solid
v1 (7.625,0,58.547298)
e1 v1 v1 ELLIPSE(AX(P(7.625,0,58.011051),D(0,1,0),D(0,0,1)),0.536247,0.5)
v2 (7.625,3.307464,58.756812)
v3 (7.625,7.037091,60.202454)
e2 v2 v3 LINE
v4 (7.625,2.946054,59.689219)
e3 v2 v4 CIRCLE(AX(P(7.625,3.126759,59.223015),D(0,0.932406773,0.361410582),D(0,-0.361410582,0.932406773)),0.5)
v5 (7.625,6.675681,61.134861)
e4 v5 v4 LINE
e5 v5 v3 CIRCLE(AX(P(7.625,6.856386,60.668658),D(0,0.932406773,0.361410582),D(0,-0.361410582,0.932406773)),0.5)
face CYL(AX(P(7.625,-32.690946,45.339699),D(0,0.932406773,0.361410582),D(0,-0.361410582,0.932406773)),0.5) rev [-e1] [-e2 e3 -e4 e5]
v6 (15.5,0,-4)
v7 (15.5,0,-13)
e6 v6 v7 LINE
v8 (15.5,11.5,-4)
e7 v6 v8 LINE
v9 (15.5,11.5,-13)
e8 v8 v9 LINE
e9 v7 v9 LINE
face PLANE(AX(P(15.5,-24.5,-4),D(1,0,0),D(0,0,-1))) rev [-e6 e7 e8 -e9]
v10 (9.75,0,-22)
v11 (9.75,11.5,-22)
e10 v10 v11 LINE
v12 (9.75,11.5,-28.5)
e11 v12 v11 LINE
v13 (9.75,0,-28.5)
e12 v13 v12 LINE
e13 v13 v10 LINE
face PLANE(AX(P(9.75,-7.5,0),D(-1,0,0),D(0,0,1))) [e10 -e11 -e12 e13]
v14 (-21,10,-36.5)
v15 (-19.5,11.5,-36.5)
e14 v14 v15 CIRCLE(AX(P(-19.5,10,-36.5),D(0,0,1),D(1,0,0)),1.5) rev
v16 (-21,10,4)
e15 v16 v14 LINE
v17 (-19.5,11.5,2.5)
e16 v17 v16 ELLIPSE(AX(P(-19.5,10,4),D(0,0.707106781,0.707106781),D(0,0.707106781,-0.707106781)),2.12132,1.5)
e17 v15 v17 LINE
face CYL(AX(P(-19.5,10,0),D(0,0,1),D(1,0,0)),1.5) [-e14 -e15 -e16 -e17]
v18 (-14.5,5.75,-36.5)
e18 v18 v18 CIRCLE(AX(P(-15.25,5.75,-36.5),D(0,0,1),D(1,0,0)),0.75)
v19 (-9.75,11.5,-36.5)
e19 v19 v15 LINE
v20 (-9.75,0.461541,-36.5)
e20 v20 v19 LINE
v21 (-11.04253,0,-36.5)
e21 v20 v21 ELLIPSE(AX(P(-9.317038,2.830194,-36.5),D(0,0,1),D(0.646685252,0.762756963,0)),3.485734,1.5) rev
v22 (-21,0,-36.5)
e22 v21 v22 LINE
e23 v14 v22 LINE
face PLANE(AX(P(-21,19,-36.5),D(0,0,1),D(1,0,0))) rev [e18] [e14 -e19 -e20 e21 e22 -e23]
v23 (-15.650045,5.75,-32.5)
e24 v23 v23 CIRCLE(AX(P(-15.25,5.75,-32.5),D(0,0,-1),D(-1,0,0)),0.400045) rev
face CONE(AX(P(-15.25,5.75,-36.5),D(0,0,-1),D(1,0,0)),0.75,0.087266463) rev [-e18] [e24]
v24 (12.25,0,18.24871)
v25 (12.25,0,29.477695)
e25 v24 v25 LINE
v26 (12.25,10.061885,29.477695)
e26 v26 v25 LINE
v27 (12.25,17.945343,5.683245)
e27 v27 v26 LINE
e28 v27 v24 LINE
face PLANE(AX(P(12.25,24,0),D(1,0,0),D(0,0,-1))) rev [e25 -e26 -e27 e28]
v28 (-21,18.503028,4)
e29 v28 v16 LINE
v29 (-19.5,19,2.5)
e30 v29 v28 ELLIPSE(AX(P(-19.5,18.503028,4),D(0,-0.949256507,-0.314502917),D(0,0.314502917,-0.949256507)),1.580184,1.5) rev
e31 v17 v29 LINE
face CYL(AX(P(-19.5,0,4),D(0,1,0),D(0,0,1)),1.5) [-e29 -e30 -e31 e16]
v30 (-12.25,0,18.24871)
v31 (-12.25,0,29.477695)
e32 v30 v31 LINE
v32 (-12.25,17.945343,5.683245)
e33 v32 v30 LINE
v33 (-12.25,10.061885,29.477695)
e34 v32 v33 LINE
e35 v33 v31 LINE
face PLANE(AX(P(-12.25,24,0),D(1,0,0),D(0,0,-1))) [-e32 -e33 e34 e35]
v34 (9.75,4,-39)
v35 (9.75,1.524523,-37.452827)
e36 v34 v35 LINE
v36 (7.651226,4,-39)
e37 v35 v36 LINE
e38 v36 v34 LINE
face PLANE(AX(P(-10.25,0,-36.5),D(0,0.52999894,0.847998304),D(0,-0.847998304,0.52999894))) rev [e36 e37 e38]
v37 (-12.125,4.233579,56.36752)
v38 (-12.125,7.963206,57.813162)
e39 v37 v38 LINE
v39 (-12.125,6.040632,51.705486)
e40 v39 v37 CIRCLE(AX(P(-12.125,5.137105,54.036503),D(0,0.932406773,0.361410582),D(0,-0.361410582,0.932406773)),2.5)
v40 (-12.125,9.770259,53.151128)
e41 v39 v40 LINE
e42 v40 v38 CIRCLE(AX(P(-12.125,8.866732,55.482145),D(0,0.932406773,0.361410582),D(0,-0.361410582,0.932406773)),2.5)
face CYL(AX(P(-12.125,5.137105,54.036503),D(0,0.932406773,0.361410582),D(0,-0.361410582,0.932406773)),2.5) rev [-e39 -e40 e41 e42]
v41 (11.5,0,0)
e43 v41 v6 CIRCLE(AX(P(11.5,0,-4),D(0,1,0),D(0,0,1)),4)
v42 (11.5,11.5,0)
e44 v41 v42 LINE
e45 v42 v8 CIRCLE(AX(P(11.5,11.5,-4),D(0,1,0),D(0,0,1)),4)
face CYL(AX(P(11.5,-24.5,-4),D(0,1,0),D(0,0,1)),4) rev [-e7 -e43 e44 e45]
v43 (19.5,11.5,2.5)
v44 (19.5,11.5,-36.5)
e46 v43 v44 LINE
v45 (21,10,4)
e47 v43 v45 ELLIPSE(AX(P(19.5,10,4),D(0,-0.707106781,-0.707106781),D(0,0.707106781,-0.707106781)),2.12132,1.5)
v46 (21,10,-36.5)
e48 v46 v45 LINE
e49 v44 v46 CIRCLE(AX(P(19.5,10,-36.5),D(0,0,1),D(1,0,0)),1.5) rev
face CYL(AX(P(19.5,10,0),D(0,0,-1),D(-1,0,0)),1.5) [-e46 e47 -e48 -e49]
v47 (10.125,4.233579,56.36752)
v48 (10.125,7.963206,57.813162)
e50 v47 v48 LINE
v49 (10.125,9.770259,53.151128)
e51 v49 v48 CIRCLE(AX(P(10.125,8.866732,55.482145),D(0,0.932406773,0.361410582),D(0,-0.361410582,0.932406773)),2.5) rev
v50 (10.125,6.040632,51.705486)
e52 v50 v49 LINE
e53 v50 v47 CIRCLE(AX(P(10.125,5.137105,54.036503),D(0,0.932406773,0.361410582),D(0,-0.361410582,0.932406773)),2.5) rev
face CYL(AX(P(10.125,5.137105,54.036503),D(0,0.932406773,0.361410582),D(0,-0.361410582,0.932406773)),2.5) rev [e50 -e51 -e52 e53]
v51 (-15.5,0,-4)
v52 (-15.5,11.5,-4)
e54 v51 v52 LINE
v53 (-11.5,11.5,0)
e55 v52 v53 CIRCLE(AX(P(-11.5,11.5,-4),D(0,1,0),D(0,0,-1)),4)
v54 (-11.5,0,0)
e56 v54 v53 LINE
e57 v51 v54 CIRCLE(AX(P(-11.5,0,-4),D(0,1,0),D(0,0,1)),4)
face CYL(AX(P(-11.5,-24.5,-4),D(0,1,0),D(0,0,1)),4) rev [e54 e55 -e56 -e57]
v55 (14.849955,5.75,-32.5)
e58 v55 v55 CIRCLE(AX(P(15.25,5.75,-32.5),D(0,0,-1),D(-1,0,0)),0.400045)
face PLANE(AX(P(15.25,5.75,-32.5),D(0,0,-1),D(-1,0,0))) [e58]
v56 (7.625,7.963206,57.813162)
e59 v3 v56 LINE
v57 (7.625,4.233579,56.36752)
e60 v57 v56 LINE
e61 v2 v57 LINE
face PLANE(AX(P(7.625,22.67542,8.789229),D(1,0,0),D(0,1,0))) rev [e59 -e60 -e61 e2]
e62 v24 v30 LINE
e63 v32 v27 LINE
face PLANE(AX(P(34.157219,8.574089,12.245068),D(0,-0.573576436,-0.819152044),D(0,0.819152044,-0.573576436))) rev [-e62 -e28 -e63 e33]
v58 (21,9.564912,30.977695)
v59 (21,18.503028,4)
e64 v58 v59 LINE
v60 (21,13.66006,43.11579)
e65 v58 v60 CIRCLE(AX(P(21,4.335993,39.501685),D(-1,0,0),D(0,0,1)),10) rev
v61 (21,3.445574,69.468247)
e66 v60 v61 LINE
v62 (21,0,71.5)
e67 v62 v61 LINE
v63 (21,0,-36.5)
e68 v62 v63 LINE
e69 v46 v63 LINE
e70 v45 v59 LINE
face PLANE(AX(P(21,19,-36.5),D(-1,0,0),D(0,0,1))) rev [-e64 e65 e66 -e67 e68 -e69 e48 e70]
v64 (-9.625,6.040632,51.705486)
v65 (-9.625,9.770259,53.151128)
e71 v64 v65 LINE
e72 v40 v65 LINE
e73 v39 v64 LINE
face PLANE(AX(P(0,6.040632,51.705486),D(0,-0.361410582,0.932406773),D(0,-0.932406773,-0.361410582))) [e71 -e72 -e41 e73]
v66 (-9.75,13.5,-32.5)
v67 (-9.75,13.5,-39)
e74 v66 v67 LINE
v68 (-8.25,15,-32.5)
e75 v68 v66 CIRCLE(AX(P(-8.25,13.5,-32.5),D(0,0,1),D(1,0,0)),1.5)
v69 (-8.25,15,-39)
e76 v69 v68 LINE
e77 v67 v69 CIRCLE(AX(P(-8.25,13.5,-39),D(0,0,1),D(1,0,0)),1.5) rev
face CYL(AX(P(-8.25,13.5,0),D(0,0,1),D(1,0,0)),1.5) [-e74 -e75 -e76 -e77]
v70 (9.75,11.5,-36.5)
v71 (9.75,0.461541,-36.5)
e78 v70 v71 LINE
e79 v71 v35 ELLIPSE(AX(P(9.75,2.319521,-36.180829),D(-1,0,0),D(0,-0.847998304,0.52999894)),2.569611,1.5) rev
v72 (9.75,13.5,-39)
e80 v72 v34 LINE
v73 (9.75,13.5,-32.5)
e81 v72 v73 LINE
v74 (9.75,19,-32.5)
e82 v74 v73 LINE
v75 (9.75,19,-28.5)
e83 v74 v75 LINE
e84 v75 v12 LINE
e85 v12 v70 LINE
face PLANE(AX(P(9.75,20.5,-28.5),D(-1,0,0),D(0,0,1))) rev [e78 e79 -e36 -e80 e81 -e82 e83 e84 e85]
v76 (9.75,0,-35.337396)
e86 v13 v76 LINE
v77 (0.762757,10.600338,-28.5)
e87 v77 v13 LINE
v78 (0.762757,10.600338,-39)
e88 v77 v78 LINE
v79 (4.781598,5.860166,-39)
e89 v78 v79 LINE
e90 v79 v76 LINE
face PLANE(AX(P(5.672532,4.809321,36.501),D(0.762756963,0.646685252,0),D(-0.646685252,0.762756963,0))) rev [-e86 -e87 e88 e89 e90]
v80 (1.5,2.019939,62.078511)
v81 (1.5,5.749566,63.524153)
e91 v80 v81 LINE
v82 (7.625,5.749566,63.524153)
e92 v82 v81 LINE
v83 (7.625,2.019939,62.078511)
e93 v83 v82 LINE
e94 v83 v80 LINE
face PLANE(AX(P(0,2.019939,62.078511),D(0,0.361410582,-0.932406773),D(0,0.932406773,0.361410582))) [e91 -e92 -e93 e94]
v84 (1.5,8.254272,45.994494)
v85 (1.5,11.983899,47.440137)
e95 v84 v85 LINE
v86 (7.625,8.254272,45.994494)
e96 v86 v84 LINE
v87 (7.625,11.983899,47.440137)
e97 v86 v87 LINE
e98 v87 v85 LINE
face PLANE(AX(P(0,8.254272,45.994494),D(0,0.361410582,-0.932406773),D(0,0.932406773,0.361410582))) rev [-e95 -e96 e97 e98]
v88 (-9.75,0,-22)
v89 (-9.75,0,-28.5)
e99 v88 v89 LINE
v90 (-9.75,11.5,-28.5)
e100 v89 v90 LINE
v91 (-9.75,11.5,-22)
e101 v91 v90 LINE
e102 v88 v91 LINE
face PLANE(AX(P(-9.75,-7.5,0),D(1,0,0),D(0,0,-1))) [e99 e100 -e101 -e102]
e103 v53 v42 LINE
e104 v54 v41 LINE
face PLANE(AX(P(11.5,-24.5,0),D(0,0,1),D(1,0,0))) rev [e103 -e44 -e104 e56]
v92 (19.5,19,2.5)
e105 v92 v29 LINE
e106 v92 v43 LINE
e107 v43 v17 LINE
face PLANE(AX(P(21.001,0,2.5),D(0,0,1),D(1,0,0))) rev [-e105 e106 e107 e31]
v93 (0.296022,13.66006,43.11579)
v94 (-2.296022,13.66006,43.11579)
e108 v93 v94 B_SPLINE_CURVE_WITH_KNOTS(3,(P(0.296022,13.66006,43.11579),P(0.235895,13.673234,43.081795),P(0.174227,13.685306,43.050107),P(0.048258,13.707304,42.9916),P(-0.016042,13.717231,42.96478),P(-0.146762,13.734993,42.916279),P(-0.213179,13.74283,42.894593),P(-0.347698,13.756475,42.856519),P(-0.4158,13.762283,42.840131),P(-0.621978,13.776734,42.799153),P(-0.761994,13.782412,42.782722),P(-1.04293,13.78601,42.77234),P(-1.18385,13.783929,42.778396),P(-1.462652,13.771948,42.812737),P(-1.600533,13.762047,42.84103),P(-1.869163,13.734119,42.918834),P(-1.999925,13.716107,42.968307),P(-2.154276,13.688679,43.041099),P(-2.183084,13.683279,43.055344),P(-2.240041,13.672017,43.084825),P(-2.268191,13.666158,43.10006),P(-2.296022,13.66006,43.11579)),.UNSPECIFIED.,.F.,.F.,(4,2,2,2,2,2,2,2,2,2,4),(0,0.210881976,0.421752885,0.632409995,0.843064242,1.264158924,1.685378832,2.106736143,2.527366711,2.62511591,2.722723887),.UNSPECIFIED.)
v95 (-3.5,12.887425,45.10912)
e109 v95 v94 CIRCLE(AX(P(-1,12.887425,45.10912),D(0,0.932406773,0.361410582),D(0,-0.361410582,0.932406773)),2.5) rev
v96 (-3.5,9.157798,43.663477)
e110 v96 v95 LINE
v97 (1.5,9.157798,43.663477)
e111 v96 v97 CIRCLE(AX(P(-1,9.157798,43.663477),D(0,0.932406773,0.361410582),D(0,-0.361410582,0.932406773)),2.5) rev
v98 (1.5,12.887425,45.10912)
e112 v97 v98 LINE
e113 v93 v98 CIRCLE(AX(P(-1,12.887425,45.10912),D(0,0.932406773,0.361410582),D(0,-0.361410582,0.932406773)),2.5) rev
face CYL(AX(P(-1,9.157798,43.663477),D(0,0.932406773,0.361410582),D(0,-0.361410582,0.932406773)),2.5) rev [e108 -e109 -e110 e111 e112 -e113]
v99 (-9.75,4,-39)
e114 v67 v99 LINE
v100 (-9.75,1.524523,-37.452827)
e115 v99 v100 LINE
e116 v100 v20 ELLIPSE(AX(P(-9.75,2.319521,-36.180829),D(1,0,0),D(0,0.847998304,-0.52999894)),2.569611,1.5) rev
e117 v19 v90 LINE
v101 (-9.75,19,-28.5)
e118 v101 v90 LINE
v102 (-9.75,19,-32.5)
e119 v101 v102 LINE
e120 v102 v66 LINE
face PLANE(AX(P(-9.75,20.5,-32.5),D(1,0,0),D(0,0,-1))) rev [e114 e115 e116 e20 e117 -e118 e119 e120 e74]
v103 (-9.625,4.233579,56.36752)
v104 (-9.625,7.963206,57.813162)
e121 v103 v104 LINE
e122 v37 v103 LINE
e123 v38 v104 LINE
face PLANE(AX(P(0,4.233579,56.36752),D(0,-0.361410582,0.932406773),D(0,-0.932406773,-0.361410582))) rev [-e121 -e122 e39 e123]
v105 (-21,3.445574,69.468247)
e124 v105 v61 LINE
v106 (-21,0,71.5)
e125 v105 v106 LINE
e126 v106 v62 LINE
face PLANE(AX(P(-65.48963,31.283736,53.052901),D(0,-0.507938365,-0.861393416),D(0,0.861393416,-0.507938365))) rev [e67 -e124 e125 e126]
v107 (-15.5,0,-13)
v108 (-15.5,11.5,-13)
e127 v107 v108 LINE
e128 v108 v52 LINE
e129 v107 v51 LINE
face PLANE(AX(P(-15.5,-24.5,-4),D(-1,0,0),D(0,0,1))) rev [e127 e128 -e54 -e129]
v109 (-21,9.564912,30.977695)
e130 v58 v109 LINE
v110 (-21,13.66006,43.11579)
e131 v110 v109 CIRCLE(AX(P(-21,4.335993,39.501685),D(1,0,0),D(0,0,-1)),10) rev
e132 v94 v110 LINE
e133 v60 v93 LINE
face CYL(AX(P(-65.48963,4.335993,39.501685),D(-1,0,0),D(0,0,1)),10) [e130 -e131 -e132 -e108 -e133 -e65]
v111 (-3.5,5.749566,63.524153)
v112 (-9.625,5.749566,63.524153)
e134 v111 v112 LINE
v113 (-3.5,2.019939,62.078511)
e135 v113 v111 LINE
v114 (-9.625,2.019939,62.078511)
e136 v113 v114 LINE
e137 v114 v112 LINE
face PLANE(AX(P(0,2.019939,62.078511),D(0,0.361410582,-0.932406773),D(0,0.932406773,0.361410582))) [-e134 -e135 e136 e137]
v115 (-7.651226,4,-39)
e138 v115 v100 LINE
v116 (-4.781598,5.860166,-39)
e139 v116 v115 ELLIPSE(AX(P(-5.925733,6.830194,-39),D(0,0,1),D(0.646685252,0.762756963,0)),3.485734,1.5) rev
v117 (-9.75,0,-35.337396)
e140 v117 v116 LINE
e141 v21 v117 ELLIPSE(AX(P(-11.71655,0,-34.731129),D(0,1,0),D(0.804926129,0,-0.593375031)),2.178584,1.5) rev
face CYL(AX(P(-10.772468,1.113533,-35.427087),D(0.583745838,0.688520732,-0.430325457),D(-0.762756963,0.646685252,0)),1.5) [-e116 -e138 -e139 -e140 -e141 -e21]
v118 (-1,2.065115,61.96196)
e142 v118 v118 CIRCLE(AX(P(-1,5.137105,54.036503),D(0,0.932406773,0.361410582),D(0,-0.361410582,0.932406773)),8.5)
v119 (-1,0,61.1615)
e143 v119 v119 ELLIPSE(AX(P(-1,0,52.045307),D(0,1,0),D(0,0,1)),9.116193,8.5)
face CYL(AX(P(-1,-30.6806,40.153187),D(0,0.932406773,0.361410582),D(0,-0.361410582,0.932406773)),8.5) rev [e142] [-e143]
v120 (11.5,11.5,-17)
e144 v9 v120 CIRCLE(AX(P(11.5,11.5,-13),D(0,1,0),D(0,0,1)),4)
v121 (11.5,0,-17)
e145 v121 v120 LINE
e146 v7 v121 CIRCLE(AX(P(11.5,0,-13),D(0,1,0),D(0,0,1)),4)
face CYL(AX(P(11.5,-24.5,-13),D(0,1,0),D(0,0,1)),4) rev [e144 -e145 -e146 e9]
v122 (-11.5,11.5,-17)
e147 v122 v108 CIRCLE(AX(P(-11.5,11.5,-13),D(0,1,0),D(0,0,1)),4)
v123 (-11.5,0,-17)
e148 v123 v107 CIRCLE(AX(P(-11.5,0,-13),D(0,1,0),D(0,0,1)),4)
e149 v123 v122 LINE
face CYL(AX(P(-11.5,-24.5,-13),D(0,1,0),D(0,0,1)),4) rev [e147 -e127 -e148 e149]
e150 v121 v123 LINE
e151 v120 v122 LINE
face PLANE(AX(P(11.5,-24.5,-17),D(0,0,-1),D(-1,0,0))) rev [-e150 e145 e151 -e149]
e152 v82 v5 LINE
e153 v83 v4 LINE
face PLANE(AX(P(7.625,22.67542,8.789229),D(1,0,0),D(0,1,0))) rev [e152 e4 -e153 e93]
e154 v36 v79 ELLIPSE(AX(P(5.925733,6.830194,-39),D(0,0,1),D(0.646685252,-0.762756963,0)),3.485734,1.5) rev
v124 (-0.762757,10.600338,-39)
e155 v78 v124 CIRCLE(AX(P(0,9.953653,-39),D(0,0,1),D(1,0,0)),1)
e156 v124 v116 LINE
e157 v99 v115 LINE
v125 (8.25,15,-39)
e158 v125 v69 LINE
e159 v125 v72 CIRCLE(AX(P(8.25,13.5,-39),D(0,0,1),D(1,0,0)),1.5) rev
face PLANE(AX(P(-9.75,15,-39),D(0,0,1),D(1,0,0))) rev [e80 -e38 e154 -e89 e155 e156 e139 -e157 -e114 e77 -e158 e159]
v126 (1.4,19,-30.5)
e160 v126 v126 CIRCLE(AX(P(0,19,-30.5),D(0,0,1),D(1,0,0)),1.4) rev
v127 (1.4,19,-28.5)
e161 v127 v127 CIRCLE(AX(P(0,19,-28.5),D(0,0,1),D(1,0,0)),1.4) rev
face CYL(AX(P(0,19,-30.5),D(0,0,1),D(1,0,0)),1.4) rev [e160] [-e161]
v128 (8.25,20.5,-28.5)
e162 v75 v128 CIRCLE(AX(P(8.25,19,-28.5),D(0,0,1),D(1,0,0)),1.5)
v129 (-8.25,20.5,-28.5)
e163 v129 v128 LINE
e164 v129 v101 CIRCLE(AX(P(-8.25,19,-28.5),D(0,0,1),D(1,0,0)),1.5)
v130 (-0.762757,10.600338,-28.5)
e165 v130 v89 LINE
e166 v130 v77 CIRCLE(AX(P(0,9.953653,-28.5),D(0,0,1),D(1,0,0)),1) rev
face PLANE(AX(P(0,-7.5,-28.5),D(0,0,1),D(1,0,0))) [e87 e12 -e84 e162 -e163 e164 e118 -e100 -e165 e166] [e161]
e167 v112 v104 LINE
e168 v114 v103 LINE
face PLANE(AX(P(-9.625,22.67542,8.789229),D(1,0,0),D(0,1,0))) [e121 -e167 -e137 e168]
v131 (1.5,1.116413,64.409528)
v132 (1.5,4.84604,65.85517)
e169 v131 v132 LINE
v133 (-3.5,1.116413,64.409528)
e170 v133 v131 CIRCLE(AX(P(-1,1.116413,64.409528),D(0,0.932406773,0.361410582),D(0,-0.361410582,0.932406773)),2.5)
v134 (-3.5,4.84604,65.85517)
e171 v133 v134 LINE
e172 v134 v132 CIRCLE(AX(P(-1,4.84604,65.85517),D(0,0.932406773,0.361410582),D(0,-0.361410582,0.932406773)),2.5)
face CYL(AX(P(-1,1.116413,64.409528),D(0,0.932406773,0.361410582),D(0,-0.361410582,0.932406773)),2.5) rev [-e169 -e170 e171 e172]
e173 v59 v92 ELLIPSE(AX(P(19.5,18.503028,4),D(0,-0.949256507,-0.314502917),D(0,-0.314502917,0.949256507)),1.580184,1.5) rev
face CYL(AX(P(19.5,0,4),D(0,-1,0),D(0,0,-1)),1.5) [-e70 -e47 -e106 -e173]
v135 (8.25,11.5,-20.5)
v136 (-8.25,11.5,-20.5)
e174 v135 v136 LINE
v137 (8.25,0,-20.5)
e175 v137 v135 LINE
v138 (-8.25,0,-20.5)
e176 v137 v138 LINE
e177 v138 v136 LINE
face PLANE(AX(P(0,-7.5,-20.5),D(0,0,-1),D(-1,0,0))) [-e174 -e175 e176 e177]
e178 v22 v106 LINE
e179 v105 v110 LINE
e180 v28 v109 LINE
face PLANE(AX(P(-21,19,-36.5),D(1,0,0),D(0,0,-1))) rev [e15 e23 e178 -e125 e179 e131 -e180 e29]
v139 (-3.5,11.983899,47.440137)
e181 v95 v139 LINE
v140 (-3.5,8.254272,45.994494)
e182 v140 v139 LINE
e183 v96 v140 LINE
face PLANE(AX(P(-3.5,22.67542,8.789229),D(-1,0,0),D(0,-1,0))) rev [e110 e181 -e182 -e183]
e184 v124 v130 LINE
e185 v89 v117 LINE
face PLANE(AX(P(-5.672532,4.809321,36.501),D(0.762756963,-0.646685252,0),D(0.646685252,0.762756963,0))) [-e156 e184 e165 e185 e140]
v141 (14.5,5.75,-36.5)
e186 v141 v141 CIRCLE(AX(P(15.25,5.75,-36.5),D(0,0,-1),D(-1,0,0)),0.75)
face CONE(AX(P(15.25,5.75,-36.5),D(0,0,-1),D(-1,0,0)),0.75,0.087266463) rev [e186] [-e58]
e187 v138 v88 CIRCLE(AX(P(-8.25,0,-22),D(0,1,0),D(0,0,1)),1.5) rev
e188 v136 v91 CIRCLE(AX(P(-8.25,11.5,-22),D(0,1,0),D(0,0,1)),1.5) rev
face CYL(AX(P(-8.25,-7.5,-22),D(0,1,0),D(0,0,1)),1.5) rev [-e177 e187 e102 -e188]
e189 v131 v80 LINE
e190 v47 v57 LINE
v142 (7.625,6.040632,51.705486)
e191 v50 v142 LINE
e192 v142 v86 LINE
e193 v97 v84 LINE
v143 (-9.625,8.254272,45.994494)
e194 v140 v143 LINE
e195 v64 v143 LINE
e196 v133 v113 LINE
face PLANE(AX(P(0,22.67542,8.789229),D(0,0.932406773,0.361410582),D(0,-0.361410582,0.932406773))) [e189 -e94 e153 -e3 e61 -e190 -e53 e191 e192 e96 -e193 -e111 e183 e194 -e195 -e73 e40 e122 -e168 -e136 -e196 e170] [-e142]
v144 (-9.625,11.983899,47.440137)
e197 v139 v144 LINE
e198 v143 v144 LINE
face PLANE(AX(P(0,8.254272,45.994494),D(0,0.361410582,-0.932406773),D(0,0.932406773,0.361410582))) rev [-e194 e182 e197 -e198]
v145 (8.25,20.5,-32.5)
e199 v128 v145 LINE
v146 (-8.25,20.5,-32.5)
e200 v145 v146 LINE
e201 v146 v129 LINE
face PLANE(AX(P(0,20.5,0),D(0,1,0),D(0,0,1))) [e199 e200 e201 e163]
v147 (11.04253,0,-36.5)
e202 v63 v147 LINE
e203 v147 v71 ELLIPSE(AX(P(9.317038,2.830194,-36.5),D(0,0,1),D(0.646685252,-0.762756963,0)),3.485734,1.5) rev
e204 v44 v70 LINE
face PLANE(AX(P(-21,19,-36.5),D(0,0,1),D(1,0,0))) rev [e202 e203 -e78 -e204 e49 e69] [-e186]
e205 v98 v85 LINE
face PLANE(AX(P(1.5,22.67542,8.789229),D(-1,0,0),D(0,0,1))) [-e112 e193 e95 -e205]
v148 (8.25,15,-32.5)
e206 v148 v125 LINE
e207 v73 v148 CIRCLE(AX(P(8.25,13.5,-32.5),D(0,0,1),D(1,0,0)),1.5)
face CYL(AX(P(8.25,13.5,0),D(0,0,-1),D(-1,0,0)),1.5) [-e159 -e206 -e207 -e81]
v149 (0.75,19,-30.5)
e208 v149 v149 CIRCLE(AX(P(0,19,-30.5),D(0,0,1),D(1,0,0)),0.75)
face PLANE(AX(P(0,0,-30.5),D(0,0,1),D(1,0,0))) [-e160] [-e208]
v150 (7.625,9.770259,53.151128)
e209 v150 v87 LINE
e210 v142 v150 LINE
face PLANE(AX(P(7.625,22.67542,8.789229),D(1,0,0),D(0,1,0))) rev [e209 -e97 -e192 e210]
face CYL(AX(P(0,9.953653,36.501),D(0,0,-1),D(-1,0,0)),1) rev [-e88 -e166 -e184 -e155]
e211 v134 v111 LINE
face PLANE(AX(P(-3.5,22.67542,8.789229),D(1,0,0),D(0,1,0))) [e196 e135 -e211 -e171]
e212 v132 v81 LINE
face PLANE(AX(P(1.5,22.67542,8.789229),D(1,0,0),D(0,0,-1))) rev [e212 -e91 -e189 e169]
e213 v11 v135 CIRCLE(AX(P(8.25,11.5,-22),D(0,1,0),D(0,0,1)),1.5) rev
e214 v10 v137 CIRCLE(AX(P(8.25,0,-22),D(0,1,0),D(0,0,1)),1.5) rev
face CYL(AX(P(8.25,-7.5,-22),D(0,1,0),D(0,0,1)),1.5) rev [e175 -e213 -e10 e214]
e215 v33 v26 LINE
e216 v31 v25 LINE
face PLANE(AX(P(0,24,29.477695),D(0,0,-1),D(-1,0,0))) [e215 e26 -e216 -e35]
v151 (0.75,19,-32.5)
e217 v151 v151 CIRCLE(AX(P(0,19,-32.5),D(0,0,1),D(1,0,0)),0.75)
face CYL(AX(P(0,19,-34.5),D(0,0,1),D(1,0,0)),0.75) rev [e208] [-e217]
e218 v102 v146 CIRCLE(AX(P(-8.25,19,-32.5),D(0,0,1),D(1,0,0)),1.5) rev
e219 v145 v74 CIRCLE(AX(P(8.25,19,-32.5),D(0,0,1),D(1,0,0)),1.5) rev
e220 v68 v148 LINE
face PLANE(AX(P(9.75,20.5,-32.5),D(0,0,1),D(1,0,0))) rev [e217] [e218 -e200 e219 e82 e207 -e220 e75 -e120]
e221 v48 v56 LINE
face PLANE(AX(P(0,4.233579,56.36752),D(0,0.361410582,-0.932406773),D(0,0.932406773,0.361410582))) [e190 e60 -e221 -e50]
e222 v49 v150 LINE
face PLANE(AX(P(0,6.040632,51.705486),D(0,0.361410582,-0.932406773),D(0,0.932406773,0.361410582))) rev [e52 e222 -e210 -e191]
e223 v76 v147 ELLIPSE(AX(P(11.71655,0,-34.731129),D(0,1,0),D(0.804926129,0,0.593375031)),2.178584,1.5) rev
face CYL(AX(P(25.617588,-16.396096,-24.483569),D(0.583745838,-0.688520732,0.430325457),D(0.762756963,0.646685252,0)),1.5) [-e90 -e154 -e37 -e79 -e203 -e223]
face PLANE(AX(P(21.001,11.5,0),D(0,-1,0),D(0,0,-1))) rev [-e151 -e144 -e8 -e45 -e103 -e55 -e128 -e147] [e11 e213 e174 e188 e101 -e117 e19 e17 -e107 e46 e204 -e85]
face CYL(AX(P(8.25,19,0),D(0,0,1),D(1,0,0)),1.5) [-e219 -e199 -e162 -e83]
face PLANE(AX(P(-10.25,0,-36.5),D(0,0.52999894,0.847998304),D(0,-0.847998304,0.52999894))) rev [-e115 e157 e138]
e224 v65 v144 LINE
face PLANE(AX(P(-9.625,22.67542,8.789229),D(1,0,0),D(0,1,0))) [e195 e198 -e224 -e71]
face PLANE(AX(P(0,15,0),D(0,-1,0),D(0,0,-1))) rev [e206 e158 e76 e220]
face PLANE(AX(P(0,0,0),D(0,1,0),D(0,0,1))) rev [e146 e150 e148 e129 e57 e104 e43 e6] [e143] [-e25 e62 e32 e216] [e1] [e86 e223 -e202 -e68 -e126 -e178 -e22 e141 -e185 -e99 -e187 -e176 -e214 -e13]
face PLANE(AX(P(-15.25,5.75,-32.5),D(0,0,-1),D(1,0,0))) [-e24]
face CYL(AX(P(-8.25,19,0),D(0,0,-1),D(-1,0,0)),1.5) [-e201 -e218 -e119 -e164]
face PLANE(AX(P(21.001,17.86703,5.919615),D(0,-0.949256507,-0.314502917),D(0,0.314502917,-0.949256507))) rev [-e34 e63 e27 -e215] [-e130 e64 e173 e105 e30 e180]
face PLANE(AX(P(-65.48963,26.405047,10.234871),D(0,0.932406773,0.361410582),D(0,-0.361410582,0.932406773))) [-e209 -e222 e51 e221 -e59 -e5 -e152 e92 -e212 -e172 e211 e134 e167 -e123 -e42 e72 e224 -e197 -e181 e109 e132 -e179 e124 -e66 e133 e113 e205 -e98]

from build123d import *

# Parameters (mm, degrees)
EXTRUDE_1_DEPTH          = 19
CUT_EXTRUDE_1_REACH      = 60.798
CUT_EXTRUDE_2_DEPTH      = 19
SKETCH_5_W               = 19.5
SKETCH_5_H               = 3.999999999999993
EXTRUDE_2_DEPTH          = 9
EXTRUDE_3_DEPTH          = 3.5
EXTRUDE_3_DEPTH_BACK     = 11.5
CUT_EXTRUDE_3_REACH      = 83.003
FILLET_1_R               = 1.5
FILLET_2_R               = 1
CUT_EXTRUDE_4_DEPTH      = 19.999999999999996
FILLET_3_R               = 1.5
CUT_EXTRUDE_15_DEPTH     = 2
SKETCH_18_R              = 0.7500000000000009
CUT_EXTRUDE_16_DEPTH     = 4
SKETCH_20_R              = 0.7500000000000004
CUT_EXTRUDE_18_DEPTH     = 4
CUT_EXTRUDE_18_DRAFT     = -5.000000000000011
MIRROR_1_COPY_1_SKETCH_R = 0.7500000000000004
MIRROR_1_COPY_1_DEPTH    = 4
MIRROR_1_COPY_1_DRAFT    = -5.000000000000011
FILLET_7_R               = 1.5
CUT_EXTRUDE_22_DEPTH     = 24.000000000000007
EXTRUDE_4_DEPTH          = 42
SKETCH_24_R              = 2.499999999999999
SKETCH_24_R_2            = 2.500000000000004
CUT_EXTRUDE_23_DEPTH     = 4
SKETCH_25_R              = 8.5
CUT_EXTRUDE_24_DEPTH     = 70.91291338858937
CUT_EXTRUDE_25_DEPTH     = 70.94027802815528
EXTRUDE_5_DEPTH          = 24.5
FILLET_8_R               = 10
CUT_EXTRUDE_26_DEPTH     = 36.000000000000014


with BuildPart() as part:
    # 草图1 → 凸台-拉伸1 (new body)
    with BuildSketch(Plane(origin=(0, 0, 0), x_dir=(1, 0, 0), z_dir=(0, 1, 0))):
        Polygon((-20.999999999999996, 36.499999999999986), (21.000000000000004, 36.499999999999986), (21.00000000000001, -36.500000000000014), (-20.999999999999986, -36.500000000000014), align=None)
    extrude(amount=EXTRUDE_1_DEPTH)

    # 草图3 → 切除-拉伸1 (cut, up to next)
    with BuildSketch(Plane.ZY.offset(20.999999999999993), mode=Mode.PRIVATE) as cut_extrude_1_sk1:
        Polygon((-36.499999999999986, 19), (-36.499999999999986, 11.5), (2.500000000000014, 11.5), (2.500000000000016, 19), align=None)
    cut_extrude_1_tool1 = extrude(cut_extrude_1_sk1.sketch, amount=-CUT_EXTRUDE_1_REACH, mode=Mode.PRIVATE) & part.part
    # 草图3 → 切除-拉伸1 (cut, up to next)
    with BuildSketch(Plane.ZY.offset(20.999999999999993), mode=Mode.PRIVATE) as cut_extrude_1_sk2:
        Polygon((36.500000000000014, 19), (2.500000000000014, 19), (30.977695197165154, 9.564912493391638), (36.500000000000014, 0), align=None)
    cut_extrude_1_tool2 = extrude(cut_extrude_1_sk2.sketch, amount=-CUT_EXTRUDE_1_REACH, mode=Mode.PRIVATE) & part.part
    add(cut_extrude_1_tool1.solids().sort_by_distance((-21, 15.25, -17))[0], mode=Mode.SUBTRACT)
    add(cut_extrude_1_tool2.solids().sort_by_distance((-21, 14.294033, 26.119155))[0], mode=Mode.SUBTRACT)

    # 草图4 → 切除-拉伸2 (cut)
    with BuildSketch(Plane(origin=(0, 11.5, 0), x_dir=(1, 0, 0), z_dir=(0, 1, 0))):
        with BuildLine():
            ThreePointArc((-8.249999999999991, 20.499999999999986), (-9.310660171779816, 20.939339828220167), (-9.749999999999991, 21.99999999999999))
            Line((-9.749999999999991, 21.99999999999999), (-9.749999999999991, 28.49999999999999))
            Line((-9.749999999999991, 28.49999999999999), (9.750000000000009, 28.49999999999999))
            Line((9.750000000000009, 28.49999999999999), (9.750000000000009, 21.999999999999993))
            ThreePointArc((9.750000000000009, 21.999999999999993), (9.31066017177983, 20.93933982822017), (8.250000000000009, 20.49999999999999))
            Line((8.250000000000009, 20.49999999999999), (-8.249999999999991, 20.499999999999986))
        make_face()
    extrude(amount=-CUT_EXTRUDE_2_DEPTH, mode=Mode.SUBTRACT)

    # 草图5 → 凸台-拉伸2 (add)
    with BuildSketch(Plane(origin=(0, 11.5, 0), x_dir=(1, 0, 0), z_dir=(0, 1, 0))):
        with Locations((8.88e-15, 30.49999999999999)):
            Rectangle(SKETCH_5_W, SKETCH_5_H)
    extrude(amount=EXTRUDE_2_DEPTH)

    # 草图6 → 凸台-拉伸3 (add, two sides: drawn at the far end of the back side and taken through both)
    with BuildSketch(Plane(origin=(0, 11.5, 0), x_dir=(1, 0, 0), z_dir=(0, 1, 0)).offset(-EXTRUDE_3_DEPTH_BACK)):
        Polygon((-9.749999999999991, 32.499999999999986), (-9.749999999999991, 38.999999999999986), (9.750000000000007, 38.999999999999986), (9.750000000000009, 32.499999999999986), align=None)
    extrude(amount=EXTRUDE_3_DEPTH + EXTRUDE_3_DEPTH_BACK)

    # 草图7 → 切除-拉伸3 (cut, up to next)
    with BuildSketch(Plane(origin=(0, 0, -38.999999999999986), x_dir=(-1, 0, 0), z_dir=(0, 0, -1)), mode=Mode.PRIVATE) as cut_extrude_3_sk1:
        Polygon((0, 11.500000000000002), (9.749999999999991, 0), (-9.750000000000007, -6.94e-15), align=None)
    cut_extrude_3_tool1 = extrude(cut_extrude_3_sk1.sketch, amount=-CUT_EXTRUDE_3_REACH, mode=Mode.PRIVATE) & part.part
    add(cut_extrude_3_tool1.solids().sort_by_distance((0, 3.833333, -39))[0], mode=Mode.SUBTRACT)

    # 圆角1
    fillet_1_edges = [part.edges().sort_by_distance(p)[0] for p in [
        (9.750000000000009, 20.5, -30.499999999999986),
        (-9.749999999999991, 20.5, -30.499999999999986),
        (9.750000000000007, 15, -35.749999999999986),
        (-9.749999999999991, 15, -35.749999999999986),
    ]]
    fillet(fillet_1_edges, radius=FILLET_1_R)

    # 圆角2
    fillet_2_edges = [part.edges().sort_by_distance(p)[0] for p in [
        (0, 11.500000000000002, -33.749999999999986),
    ]]
    fillet(fillet_2_edges, radius=FILLET_2_R)

    # 草图8 → 切除-拉伸4 (cut)
    with BuildSketch(Plane(origin=(9.750000000000009, 0, 0), x_dir=(0, 0, -1), z_dir=(1, 0, 0))):
        Polygon((36.499999999999986, 0), (38.999999999999986, 4), (38.999999999999986, 0), align=None)
    extrude(amount=-CUT_EXTRUDE_4_DEPTH, mode=Mode.SUBTRACT)

    # 圆角3
    fillet_3_edges = [part.edges().sort_by_distance(p)[0] for p in [
        (8.054347826086955, 2.0000000000000036, -37.74999999999998),
        (-8.054347826086952, 1.9999999999999991, -37.749999999999986),
    ]]
    fillet(fillet_3_edges, radius=FILLET_3_R)

    # 草图17 → 切除-拉伸15 (cut)
    with BuildSketch(Plane(origin=(0, 0, -28.49999999999999), x_dir=(-1, 0, 0), z_dir=(0, 0, -1))):
        with BuildLine():
            ThreePointArc((1.39999999999999, 18.999999999999996), (-8.59e-15, 20.399999999999995), (-1.4000000000000072, 18.999999999999996))
            Line((-1.4000000000000075, 18.999999999999996), (1.3999999999999897, 18.999999999999996))
        make_face()
        with BuildLine():
            Line((1.3999999999999897, 18.999999999999996), (-1.4000000000000075, 18.999999999999996))
            ThreePointArc((-1.4000000000000072, 18.999999999999996), (-8.93e-15, 17.599999999999998), (1.39999999999999, 18.999999999999996))
        make_face()
    extrude(amount=CUT_EXTRUDE_15_DEPTH, mode=Mode.SUBTRACT)

    # 草图18 → 切除-拉伸16 (cut)
    with BuildSketch(Plane.XY.offset(-30.499999999999993)):
        with Locations((8.67e-15, 18.999999999999996)):
            Circle(SKETCH_18_R)
    extrude(amount=-CUT_EXTRUDE_16_DEPTH, mode=Mode.SUBTRACT)


with BuildPart() as cut_extrude_18_tool:
    # 草图20 → 切除-拉伸18 (with draft: the straight prism first)
    with BuildSketch(Plane(origin=(0, 0, -36.499999999999986), x_dir=(-1, 0, 0), z_dir=(0, 0, -1))):
        with Locations((-15.250000000000005, 5.75)):
            Circle(SKETCH_20_R)
    extrude(amount=-CUT_EXTRUDE_18_DEPTH)
    # 切除-拉伸18: the draft: its side faces are tilted about the plane it starts from
    cut_extrude_18_sides = [cut_extrude_18_tool.faces().sort_by_distance(p)[0] for p in [
        (16, 5.75, -34.5),
    ]]
    draft(cut_extrude_18_sides, Plane(origin=(0, 0, -36.499999999999986), x_dir=(-1, 0, 0), z_dir=(0, 0, -1)), CUT_EXTRUDE_18_DRAFT)


with BuildPart() as part_1:
    add(part.part)

    # 切除-拉伸18: cut by cut_extrude_18_tool
    add(cut_extrude_18_tool.part, mode=Mode.SUBTRACT)


with BuildPart() as mirror_1_copy_1_tool:
    # 镜向1 copy 1 sketch → 镜向1 copy 1 (with draft: the straight prism first)
    with BuildSketch(Plane(origin=(0, 0, -36.499999999999986), x_dir=(1, 0, 0), z_dir=(0, 0, -1))):
        with Locations((-15.250000000000005, -5.75)):
            Circle(MIRROR_1_COPY_1_SKETCH_R)
    extrude(amount=-MIRROR_1_COPY_1_DEPTH)
    # 镜向1 copy 1: the draft: its side faces are tilted about the plane it starts from
    mirror_1_copy_1_sides = [mirror_1_copy_1_tool.faces().sort_by_distance(p)[0] for p in [
        (-16, 5.75, -34.5),
    ]]
    draft(mirror_1_copy_1_sides, Plane(origin=(0, 0, -36.499999999999986), x_dir=(1, 0, 0), z_dir=(0, 0, -1)), MIRROR_1_COPY_1_DRAFT)


with BuildPart() as part_2:
    add(part_1.part)

    # 镜向1 copy 1: cut by mirror_1_copy_1_tool
    add(mirror_1_copy_1_tool.part, mode=Mode.SUBTRACT)

    # 圆角7
    fillet_7_edges = [part_2.edges().sort_by_distance(p)[0] for p in [
        (-20.999999999999996, 11.5, -16.999999999999982),
        (-20.999999999999993, 15.25, 2.500000000000019),
        (21.000000000000007, 15.25, 2.5000000000000138),
        (21.000000000000007, 11.5, -16.999999999999986),
    ]]
    fillet(fillet_7_edges, radius=FILLET_7_R)

    # 草图21 → 切除-拉伸22 (cut)
    with BuildSketch(Plane.XZ):
        Polygon((-12.24999999999999, 29.47769519716515), (-12.24999999999999, 5.683244946958155), (12.250000000000012, 5.683244946958155), (12.25000000000001, 29.477695197165154), align=None)
    extrude(amount=-CUT_EXTRUDE_22_DEPTH, mode=Mode.SUBTRACT)

    # 草图23 → 凸台-拉伸4 (add)
    with BuildSketch(Plane(origin=(21.000000000000007, 0, -2e-15), x_dir=(-1e-16, 0, -1), z_dir=(1, 0, -1e-16))):
        Polygon((-30.977695197165158, 9.564912493391638), (-30.977695197165158, 18.364912493391635), (-69.46824654038242, 3.445573664766443), (-71.50000000000001, 0), (-36.50000000000001, 0), align=None)
    extrude(amount=-EXTRUDE_4_DEPTH)

    # 草图24 → 切除-拉伸23 (cut)
    with BuildSketch(Plane(origin=(9.7e-16, 26.405047147072228, 10.23487145352138), x_dir=(1, -3e-17, -1e-17), z_dir=(0, 0.9324067733233699, 0.36141058238615825))):
        Polygon((-9.624999999999988, -57.15239682031271), (-9.624999999999988, -39.90239682031272), (7.625000000000015, -39.90239682031271), (7.625000000000015, -57.15239682031271), align=None)
        with Locations((10.125000000000002, -48.527396820312816)):
            Circle(SKETCH_24_R)
        with BuildLine():
            Line((7.625000000000015, -48.527396820312816), (7.625000000000015, -51.0273968203127))
            Line((7.625000000000007, -51.0273968203127), (10.125000000000009, -51.0273968203127))
            ThreePointArc((10.125000000000007, -51.027396820312816), (8.357233047033636, -50.295163773279185), (7.625000000000003, -48.527396820312816))
        make_face()
        with BuildLine():
            Line((7.625000000000015, -46.0273968203127), (7.625000000000015, -48.527396820312816))
            ThreePointArc((7.625000000000003, -48.527396820312816), (8.357233047033636, -46.75962986734645), (10.125000000000009, -46.027396820312816))
            Line((10.125000000000009, -46.0273968203127), (7.625000000000013, -46.0273968203127))
        make_face()
        with Locations((-12.12499999999999, -48.52739682031258)):
            Circle(SKETCH_24_R)
        with BuildLine():
            Line((-12.124999999999996, -51.027396820312674), (-9.624999999999988, -51.02739682031271))
            Line((-9.624999999999988, -51.02739682031271), (-9.624999999999988, -48.52739682031258))
            ThreePointArc((-9.62499999999999, -48.52739682031258), (-10.357233047033622, -50.29516377327895), (-12.124999999999996, -51.02739682031258))
        make_face()
        with BuildLine():
            ThreePointArc((-12.124999999999977, -46.02739682031258), (-10.357233047033617, -46.75962986734622), (-9.62499999999999, -48.52739682031258))
            Line((-9.624999999999988, -48.52739682031258), (-9.624999999999988, -46.0273968203127))
            Line((-9.624999999999988, -46.0273968203127), (-12.124999999999977, -46.027396820312674))
        make_face()
        with Locations((-0.9999999999999847, -37.40239682031271)):
            Circle(SKETCH_24_R_2)
        with BuildLine():
            Line((-0.9999999434812805, -39.90239682031271), (1.500000000000015, -39.90239682031271))
            Line((1.500000000000015, -39.90239682031272), (1.500000000000015, -37.40239682031271))
            ThreePointArc((1.5000000000000193, -37.40239682031271), (0.7677669729487664, -39.1701637532967), (-0.9999999434812799, -39.90239682031272))
        make_face()
        with BuildLine():
            Line((-3.499999999999985, -39.90239682031272), (-0.9999999434812805, -39.90239682031271))
            ThreePointArc((-0.9999999434812799, -39.90239682031272), (-2.7677669329839762, -39.17016379326146), (-3.4999999999999885, -37.40239682031271))
            Line((-3.499999999999984, -37.40239682031271), (-3.499999999999984, -39.90239682031271))
        make_face()
        with Locations((-1.000000000000067, -59.65239682031271)):
            Circle(SKETCH_24_R_2)
        with BuildLine():
            ThreePointArc((-1.0000000349305498, -57.1523968203127), (0.7677669406165137, -57.88462985499655), (1.499999999999937, -59.65239682031271))
            Line((1.500000000000015, -59.6523968203127), (1.500000000000015, -57.1523968203127))
            Line((1.500000000000015, -57.15239682031271), (-1.00000003493055, -57.15239682031271))
        make_face()
        with BuildLine():
            Line((-3.499999999999984, -57.15239682031271), (-3.499999999999984, -59.6523968203127))
            ThreePointArc((-3.500000000000071, -59.65239682031271), (-2.767766965316229, -57.88462987969613), (-1.0000000349305498, -57.1523968203127))
            Line((-1.00000003493055, -57.15239682031271), (-3.499999999999985, -57.15239682031271))
        make_face()
    extrude(amount=-CUT_EXTRUDE_23_DEPTH, mode=Mode.SUBTRACT)

    # 草图25 → 切除-拉伸24 (cut, through all)
    with BuildSketch(Plane(origin=(-6.7e-16, 22.67542005377876, 8.789229123976755), x_dir=(1, 3e-17, 1e-17), z_dir=(0, 0.9324067733233699, 0.3614105823861583))):
        with Locations(Location((-0.9999999999999868, -48.52739682031273, 0), (0, 0, 270))):
            Circle(SKETCH_25_R)
    extrude(amount=-CUT_EXTRUDE_24_DEPTH, mode=Mode.SUBTRACT)

    # 草图27 → 切除-拉伸25 (cut, through all)
    with BuildSketch(Plane(origin=(9.7e-16, 26.405047147072228, 10.23487145352138), x_dir=(1, -3e-17, -1e-17), z_dir=(0, 0.9324067733233699, 0.36141058238615825))):
        with BuildLine():
            ThreePointArc((7.625, -53.58989682031273), (7.125000000000012, -54.08989682031273), (7.624999999999999, -54.58989682031273))
            Line((7.625000000000016, -54.58989682031273), (7.625000000000016, -53.58989682031273))
        make_face()
        with BuildLine():
            Line((7.625000000000016, -53.58989682031273), (7.625000000000016, -54.58989682031273))
            ThreePointArc((7.624999999999999, -54.58989682031273), (7.978553390593286, -54.443450210906015), (8.12500000000002, -54.08989682031273))
            ThreePointArc((8.12500000000002, -54.08989682031273), (7.978553390593286, -53.73634342971945), (7.625, -53.58989682031273))
        make_face()
    extrude(amount=-CUT_EXTRUDE_25_DEPTH, mode=Mode.SUBTRACT)

    # 草图28 → 凸台-拉伸5 (add)
    with BuildSketch(Plane(origin=(-12.24999999999999, 0, 0), x_dir=(0, 0, -1), z_dir=(1, 0, 0))):
        Polygon((-5.683244946958155, 0), (-5.683244946958155, 17.94534320907723), (-18.248709537714582, 0), align=None)
    extrude(amount=EXTRUDE_5_DEPTH)

    # 圆角8
    # the kernel refuses this fillet: 10 mm, written as the material it takes off along each edge
    with BuildSketch(Plane(origin=(53.54506406890172, 18.364912493391635, 30.97769519716515), x_dir=(0, -1, -4e-16), z_dir=(-1, 0, 1e-16))) as fillet_8_piece_1:
        with BuildLine():
            CenterArc((14.028919956808336, 8.523989446573212), FILLET_8_R, 158.81314998741195, 79.6604084684634)
            Line((4.704852223574637, 12.138095270434794), (4.5183708689099635, 12.210377386912027))
            Line((4.5183708689099635, 12.210377386912027), (-0.1864813546646751, 0.07228211647723264))
            Line((-0.1864813546646751, 0.07228211647723264), (8e-17, -0.1999999999999993))
            ThreePointArc((8e-17, -0.1999999999999993), (4.399999999999999, -0.1999999999999975), (8.695421600863831, -0.1704797889314627))
            Line((8.695421600863831, -0.1704797889314627), (8.799999999999997, 0))
        make_face()
    extrude(amount=107.09012813780342, mode=Mode.SUBTRACT)

    # 草图30 → 切除-拉伸26 (cut)
    with BuildSketch(Plane(origin=(0, 11.5, 0), x_dir=(1, 0, 0), z_dir=(0, 1, 0))):
        with BuildLine():
            Line((11.499999999999979, -8.4e-16), (-11.499999999999968, -3.66e-15))
            ThreePointArc((-11.499999999999968, -3.66e-15), (-14.328427124746186, 1.1715728752538062), (-15.499999999999996, 4.000000000000024))
            Line((-15.499999999999996, 4.000000000000024), (-15.499999999999996, 12.999999999999948))
            ThreePointArc((-15.499999999999996, 12.999999999999948), (-14.328427124746188, 15.828427124746169), (-11.499999999999968, 16.99999999999998))
            Line((-11.499999999999968, 16.99999999999998), (11.499999999999975, 16.999999999999982))
            ThreePointArc((11.499999999999975, 16.999999999999982), (14.328427124746195, 15.828427124746174), (15.500000000000005, 12.999999999999956))
            Line((15.500000000000005, 12.999999999999956), (15.500000000000007, 4.000000000000028))
            ThreePointArc((15.500000000000007, 4.000000000000028), (14.328427124746197, 1.1715728752538093), (11.499999999999979, -8.4e-16))
        make_face()
    extrude(amount=-CUT_EXTRUDE_26_DEPTH, mode=Mode.SUBTRACT)


solid = part_2.part
